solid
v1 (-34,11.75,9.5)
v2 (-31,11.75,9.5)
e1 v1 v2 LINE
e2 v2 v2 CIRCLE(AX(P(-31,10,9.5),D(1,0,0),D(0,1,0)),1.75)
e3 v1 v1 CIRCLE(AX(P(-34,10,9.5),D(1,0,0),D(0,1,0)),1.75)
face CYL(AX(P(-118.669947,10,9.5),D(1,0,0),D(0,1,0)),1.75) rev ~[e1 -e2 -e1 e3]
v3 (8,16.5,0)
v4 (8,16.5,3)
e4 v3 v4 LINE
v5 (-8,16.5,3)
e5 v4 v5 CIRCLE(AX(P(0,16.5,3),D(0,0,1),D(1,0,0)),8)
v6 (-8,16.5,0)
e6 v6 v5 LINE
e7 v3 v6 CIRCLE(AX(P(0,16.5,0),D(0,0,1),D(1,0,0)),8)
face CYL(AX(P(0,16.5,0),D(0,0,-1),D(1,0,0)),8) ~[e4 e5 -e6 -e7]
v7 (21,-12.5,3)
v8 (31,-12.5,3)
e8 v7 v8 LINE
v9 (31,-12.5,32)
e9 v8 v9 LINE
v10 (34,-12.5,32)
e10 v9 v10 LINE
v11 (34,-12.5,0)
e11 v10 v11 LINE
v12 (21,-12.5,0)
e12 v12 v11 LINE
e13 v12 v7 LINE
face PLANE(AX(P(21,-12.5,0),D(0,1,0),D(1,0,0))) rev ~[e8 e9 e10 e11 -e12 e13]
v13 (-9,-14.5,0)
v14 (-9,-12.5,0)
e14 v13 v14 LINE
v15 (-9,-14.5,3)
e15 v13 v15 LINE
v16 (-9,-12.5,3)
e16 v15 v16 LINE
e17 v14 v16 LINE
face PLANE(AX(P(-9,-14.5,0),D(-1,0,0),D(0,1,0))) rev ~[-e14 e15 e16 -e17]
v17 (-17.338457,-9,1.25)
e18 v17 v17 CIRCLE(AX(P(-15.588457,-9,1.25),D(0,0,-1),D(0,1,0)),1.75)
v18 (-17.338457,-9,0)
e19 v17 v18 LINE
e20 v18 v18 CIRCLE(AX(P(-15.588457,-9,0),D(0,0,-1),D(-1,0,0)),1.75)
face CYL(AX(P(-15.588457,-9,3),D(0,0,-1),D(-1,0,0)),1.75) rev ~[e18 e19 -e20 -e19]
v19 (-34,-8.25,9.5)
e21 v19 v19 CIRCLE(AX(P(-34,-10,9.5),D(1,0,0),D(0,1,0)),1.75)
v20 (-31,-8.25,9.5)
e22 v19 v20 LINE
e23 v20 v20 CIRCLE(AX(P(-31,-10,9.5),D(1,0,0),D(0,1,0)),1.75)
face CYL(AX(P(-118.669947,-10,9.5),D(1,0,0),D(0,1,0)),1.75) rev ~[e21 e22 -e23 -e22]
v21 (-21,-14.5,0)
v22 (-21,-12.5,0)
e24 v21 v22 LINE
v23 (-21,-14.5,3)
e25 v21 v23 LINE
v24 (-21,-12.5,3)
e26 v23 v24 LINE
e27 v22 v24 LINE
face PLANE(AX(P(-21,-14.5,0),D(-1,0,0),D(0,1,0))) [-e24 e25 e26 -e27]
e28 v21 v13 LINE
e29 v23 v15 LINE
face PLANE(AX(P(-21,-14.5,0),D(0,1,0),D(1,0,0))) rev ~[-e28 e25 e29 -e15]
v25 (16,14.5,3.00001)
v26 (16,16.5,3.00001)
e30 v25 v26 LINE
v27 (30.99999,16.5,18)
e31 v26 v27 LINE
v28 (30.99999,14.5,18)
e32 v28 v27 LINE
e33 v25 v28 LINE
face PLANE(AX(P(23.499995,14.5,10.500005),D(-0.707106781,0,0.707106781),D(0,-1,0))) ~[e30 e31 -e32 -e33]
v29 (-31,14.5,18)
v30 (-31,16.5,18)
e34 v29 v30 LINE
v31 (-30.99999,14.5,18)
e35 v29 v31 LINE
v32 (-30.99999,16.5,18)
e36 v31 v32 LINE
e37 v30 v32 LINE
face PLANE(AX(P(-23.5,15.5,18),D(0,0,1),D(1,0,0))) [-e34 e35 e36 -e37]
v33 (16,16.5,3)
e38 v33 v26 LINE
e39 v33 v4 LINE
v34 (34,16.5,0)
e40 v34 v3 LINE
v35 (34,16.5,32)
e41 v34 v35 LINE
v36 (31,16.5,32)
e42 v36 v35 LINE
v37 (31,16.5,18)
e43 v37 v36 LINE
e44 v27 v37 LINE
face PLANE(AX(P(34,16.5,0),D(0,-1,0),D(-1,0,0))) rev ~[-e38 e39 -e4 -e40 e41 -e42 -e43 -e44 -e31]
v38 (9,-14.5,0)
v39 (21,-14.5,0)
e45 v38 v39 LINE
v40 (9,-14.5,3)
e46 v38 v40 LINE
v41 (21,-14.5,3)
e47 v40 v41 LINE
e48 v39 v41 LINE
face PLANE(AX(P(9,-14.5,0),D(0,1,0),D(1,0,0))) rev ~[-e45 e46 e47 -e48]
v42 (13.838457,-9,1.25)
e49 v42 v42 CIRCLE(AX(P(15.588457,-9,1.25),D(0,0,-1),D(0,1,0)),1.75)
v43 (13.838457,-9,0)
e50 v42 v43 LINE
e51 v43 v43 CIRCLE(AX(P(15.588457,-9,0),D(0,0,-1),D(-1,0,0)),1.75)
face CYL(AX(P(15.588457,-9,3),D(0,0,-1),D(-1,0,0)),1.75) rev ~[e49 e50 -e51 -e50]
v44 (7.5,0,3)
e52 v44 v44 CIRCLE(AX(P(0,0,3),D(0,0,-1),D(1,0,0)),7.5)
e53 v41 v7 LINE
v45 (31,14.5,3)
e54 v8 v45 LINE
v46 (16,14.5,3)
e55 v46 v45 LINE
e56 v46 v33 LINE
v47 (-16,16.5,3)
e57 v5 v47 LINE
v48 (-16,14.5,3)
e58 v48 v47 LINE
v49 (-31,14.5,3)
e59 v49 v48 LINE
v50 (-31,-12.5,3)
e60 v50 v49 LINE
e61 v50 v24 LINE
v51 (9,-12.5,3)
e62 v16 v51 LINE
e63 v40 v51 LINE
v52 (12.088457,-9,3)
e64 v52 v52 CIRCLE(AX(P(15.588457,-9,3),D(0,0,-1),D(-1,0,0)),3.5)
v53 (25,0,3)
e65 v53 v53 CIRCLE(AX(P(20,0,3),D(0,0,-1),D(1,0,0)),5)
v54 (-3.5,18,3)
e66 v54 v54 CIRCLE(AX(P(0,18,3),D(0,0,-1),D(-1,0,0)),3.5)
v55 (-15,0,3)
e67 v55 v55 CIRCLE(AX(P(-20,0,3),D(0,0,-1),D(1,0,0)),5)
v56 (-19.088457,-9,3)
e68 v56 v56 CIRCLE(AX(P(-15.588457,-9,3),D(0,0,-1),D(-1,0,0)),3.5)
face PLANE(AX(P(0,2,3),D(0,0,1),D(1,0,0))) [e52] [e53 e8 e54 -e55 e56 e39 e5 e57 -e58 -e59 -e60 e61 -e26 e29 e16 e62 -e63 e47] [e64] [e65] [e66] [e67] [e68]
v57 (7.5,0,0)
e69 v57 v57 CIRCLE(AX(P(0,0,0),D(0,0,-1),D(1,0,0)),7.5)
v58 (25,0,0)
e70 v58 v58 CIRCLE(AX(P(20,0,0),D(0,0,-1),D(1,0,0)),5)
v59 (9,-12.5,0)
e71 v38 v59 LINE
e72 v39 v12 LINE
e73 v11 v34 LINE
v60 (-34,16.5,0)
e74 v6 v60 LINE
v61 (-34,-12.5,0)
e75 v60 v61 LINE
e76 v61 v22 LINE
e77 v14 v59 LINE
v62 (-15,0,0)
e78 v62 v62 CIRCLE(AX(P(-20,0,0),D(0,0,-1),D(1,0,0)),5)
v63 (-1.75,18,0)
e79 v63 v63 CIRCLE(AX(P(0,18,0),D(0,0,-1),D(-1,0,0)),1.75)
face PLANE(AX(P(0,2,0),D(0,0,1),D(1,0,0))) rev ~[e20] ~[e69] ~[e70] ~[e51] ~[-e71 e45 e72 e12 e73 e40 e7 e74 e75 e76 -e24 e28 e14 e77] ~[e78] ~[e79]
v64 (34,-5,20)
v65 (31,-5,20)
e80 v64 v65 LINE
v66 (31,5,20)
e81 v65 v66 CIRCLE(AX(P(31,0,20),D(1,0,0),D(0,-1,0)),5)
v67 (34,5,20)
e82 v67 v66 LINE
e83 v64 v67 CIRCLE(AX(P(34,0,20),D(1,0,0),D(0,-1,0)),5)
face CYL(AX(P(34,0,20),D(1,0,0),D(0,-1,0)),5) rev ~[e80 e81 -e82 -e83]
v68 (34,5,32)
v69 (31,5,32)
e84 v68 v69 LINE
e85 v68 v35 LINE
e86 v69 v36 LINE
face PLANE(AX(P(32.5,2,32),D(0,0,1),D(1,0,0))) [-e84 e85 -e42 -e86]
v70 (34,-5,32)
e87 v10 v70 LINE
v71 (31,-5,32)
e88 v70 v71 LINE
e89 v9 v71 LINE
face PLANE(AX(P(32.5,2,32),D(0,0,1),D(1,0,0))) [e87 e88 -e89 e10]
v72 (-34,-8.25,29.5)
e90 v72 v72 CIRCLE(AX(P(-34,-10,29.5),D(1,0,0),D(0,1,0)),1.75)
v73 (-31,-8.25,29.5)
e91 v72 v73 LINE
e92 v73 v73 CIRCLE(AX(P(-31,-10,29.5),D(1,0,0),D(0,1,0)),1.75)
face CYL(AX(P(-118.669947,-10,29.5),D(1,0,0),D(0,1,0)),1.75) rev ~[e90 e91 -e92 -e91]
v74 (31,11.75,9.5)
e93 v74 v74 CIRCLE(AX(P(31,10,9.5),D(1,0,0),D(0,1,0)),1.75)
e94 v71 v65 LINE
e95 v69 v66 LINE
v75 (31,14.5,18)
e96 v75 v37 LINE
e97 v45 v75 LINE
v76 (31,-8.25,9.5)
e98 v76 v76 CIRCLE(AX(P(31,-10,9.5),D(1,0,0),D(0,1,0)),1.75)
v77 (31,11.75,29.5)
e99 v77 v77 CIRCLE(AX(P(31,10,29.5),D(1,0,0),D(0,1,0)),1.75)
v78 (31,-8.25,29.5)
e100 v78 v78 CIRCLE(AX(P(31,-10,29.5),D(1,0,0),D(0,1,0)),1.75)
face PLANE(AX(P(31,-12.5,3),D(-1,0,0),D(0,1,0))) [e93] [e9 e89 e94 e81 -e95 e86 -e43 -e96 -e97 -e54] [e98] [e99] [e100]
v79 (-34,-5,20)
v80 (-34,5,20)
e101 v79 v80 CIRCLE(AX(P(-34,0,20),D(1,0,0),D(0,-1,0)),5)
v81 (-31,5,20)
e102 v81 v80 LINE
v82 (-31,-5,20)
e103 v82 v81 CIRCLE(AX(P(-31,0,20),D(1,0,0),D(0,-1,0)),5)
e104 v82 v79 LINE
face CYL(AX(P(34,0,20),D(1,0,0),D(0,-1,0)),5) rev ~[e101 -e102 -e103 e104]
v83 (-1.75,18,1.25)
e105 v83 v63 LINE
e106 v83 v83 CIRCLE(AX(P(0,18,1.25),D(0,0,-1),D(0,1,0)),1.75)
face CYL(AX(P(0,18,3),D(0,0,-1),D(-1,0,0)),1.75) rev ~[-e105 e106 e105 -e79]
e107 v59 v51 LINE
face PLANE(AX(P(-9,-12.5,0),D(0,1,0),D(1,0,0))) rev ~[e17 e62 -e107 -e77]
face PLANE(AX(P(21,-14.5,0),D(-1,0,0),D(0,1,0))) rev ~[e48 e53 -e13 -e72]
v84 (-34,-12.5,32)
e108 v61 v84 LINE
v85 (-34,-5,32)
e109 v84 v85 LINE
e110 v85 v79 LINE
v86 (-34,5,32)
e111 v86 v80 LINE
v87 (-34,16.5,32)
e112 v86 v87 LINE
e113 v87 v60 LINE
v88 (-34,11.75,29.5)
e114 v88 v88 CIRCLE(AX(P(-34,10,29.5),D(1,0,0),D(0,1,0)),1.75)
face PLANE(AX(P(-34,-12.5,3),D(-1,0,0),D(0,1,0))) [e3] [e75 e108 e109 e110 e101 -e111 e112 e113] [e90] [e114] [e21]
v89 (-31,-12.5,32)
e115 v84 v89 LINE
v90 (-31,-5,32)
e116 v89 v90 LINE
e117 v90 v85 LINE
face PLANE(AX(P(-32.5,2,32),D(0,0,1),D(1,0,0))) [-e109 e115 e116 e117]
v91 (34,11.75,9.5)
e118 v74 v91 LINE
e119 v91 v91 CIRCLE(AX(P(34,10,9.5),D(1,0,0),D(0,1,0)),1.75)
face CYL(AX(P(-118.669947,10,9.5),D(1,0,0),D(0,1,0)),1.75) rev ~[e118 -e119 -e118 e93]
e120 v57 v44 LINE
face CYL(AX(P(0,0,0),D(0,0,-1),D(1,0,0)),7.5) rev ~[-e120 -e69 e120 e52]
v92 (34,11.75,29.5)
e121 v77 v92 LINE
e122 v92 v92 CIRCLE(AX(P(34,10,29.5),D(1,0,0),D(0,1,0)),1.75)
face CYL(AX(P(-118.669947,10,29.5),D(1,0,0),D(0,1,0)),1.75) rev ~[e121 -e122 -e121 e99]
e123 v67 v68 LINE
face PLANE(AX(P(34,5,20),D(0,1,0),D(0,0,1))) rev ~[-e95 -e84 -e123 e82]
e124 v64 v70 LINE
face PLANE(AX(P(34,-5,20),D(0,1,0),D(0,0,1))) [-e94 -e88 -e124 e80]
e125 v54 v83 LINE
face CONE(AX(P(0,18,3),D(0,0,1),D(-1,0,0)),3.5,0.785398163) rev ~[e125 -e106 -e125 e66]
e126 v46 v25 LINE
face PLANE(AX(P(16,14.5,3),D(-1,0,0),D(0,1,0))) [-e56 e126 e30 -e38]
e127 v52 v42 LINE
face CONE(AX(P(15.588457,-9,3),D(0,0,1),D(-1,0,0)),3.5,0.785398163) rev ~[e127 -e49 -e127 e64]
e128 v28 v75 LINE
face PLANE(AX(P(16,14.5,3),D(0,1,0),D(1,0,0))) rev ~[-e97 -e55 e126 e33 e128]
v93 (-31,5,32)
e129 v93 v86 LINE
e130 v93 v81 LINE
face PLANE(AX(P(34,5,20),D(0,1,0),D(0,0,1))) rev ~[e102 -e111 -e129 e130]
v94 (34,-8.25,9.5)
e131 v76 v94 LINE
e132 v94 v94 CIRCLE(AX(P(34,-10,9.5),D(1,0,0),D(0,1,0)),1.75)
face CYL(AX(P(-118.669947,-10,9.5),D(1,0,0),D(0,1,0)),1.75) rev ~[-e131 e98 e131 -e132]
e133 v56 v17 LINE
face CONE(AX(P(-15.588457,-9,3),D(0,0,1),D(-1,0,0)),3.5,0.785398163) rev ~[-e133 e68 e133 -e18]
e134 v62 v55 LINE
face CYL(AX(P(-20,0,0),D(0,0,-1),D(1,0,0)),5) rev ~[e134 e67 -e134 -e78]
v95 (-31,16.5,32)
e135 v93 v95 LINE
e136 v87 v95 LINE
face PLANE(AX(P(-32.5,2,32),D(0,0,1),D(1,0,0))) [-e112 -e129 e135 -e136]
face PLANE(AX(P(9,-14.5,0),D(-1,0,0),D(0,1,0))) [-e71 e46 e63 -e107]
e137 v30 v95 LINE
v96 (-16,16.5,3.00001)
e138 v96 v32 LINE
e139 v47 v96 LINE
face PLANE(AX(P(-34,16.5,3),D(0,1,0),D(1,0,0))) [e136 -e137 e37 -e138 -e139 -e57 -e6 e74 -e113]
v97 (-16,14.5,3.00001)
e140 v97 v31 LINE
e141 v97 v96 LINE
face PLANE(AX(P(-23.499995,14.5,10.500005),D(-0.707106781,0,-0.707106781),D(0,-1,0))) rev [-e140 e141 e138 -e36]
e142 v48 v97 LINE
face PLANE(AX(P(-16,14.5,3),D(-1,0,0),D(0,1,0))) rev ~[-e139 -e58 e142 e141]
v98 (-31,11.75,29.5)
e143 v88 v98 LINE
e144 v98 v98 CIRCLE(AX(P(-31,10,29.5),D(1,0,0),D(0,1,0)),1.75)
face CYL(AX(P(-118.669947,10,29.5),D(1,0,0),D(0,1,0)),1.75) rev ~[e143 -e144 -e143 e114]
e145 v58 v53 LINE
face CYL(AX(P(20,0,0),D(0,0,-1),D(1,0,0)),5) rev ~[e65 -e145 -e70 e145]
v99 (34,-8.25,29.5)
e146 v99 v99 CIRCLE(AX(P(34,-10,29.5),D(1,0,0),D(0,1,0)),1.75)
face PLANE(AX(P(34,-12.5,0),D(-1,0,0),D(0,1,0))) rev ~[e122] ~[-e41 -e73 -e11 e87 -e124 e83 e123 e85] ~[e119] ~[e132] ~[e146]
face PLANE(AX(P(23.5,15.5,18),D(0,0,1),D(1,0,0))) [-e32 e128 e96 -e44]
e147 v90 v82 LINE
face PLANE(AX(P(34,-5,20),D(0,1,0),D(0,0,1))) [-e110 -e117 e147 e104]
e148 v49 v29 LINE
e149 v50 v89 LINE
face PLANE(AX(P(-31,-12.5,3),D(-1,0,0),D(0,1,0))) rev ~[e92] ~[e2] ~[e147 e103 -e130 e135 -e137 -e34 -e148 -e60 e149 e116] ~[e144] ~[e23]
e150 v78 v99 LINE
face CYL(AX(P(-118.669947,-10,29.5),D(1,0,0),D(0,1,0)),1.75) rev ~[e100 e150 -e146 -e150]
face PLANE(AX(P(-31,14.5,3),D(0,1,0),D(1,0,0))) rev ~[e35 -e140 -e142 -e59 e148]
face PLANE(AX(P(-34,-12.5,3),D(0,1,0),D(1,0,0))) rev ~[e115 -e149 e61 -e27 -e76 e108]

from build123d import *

# Parameters (mm, degrees)
F0_W            = 12
F0_H            = 2
F1_DEPTH        = 3
F2_W            = 3
F2_H            = 29
F3_DEPTH        = 29
F4_W            = 15
F4_H            = 2
F5_DEPTH        = 15
F6_SIZE         = 14.99999
F8_D            = 3.5
F10_D           = 3.5
F10_CSINK_D     = 7
F10_CSINK_ANGLE = 90
F11_R           = 7.5
F11_R_2         = 5
F12_DEPTH       = 25
F13_W           = 10
F13_H           = 12
F14_DEPTH       = 68.001


# Not quite as in the source:
# - a fillet or chamfer is up to 0.001 mm smaller than in the source, because OpenCascade refuses the exact size
# - a feature names something its author has since deleted; it is built from what else it names


with BuildPart() as f1:
    # F0 (on Top) → F1 (new body)
    with BuildSketch(Plane.XY):
        Polygon((34, -12.5), (34, 16.5), (8, 16.5), (-8, 16.5), (-34, 16.5), (-34, -12.5), (-21, -12.5), (-9, -12.5), (9, -12.5), (21, -12.5), align=None)
        with BuildLine():
            Line((-8, 16.5), (8, 16.5))
            ThreePointArc((8, 16.5), (0, 24.5), (-8, 16.5))
        make_face()
        with Locations((-15, -13.5)):
            Rectangle(F0_W, F0_H)
        with Locations((15, -13.5)):
            Rectangle(F0_W, F0_H)
    extrude(amount=F1_DEPTH)

    # F2 (on face) → F3 (join)
    with BuildSketch(Plane.XY.offset(3)):
        with Locations((-32.5, 2)):
            Rectangle(F2_W, F2_H)
        with Locations((32.5, 2)):
            Rectangle(F2_W, F2_H)
    extrude(amount=F3_DEPTH)

    # F4 (on face) → F5 (join)
    with BuildSketch(Plane.XY.offset(3)):
        with Locations((-23.5, 15.5)):
            Rectangle(F4_W, F4_H)
        with Locations((23.5, 15.5)):
            Rectangle(F4_W, F4_H)
    extrude(amount=F5_DEPTH)

    # F6 (size 15 in the source; OpenCascade refuses exactly that, so slightly less here)
    f6_edges = [f1.edges().sort_by_distance(p)[0] for p in [
        (-16, 15.5, 18),
        (16, 15.5, 18),
    ]]
    chamfer(f6_edges, length=F6_SIZE)

    # F8 (through all)
    with Locations(Plane(origin=(-34, 0, 0), x_dir=(0, -1, 0), z_dir=(-1, 0, 0))):
        with Locations((10, 29.5), (10, 9.5), (-10, 9.5), (-10, 29.5)):
            Hole(F8_D / 2)

    # F10 (through all)
    with Locations(Plane.XY.offset(3)):
        with Locations((0, 18), (-15.5884572681, -9), (15.5884572681, -9)):
            CounterSinkHole(F10_D / 2, F10_CSINK_D / 2, counter_sink_angle=F10_CSINK_ANGLE)

    # F11 (on face) → F12 (cut)
    with BuildSketch(Plane(origin=(0, 0, 0), x_dir=(1, 0, 0), z_dir=(0, 0, -1))):
        Circle(F11_R)
        with Locations((20, 0)):
            Circle(F11_R_2)
        with Locations((-20, 0)):
            Circle(F11_R_2)
    extrude(amount=-F12_DEPTH, mode=Mode.SUBTRACT)

    # F13 (on face) → F14 (cut, through all)
    with BuildSketch(Plane.YZ.offset(34)):
        with Locations((0, 26)):
            Rectangle(F13_W, F13_H)
        with BuildLine():
            ThreePointArc((-5, 20), (0, 15), (5, 20))
            Line((5, 20), (-5, 20))
        make_face()
    extrude(amount=-F14_DEPTH, mode=Mode.SUBTRACT)


solid = f1.part
